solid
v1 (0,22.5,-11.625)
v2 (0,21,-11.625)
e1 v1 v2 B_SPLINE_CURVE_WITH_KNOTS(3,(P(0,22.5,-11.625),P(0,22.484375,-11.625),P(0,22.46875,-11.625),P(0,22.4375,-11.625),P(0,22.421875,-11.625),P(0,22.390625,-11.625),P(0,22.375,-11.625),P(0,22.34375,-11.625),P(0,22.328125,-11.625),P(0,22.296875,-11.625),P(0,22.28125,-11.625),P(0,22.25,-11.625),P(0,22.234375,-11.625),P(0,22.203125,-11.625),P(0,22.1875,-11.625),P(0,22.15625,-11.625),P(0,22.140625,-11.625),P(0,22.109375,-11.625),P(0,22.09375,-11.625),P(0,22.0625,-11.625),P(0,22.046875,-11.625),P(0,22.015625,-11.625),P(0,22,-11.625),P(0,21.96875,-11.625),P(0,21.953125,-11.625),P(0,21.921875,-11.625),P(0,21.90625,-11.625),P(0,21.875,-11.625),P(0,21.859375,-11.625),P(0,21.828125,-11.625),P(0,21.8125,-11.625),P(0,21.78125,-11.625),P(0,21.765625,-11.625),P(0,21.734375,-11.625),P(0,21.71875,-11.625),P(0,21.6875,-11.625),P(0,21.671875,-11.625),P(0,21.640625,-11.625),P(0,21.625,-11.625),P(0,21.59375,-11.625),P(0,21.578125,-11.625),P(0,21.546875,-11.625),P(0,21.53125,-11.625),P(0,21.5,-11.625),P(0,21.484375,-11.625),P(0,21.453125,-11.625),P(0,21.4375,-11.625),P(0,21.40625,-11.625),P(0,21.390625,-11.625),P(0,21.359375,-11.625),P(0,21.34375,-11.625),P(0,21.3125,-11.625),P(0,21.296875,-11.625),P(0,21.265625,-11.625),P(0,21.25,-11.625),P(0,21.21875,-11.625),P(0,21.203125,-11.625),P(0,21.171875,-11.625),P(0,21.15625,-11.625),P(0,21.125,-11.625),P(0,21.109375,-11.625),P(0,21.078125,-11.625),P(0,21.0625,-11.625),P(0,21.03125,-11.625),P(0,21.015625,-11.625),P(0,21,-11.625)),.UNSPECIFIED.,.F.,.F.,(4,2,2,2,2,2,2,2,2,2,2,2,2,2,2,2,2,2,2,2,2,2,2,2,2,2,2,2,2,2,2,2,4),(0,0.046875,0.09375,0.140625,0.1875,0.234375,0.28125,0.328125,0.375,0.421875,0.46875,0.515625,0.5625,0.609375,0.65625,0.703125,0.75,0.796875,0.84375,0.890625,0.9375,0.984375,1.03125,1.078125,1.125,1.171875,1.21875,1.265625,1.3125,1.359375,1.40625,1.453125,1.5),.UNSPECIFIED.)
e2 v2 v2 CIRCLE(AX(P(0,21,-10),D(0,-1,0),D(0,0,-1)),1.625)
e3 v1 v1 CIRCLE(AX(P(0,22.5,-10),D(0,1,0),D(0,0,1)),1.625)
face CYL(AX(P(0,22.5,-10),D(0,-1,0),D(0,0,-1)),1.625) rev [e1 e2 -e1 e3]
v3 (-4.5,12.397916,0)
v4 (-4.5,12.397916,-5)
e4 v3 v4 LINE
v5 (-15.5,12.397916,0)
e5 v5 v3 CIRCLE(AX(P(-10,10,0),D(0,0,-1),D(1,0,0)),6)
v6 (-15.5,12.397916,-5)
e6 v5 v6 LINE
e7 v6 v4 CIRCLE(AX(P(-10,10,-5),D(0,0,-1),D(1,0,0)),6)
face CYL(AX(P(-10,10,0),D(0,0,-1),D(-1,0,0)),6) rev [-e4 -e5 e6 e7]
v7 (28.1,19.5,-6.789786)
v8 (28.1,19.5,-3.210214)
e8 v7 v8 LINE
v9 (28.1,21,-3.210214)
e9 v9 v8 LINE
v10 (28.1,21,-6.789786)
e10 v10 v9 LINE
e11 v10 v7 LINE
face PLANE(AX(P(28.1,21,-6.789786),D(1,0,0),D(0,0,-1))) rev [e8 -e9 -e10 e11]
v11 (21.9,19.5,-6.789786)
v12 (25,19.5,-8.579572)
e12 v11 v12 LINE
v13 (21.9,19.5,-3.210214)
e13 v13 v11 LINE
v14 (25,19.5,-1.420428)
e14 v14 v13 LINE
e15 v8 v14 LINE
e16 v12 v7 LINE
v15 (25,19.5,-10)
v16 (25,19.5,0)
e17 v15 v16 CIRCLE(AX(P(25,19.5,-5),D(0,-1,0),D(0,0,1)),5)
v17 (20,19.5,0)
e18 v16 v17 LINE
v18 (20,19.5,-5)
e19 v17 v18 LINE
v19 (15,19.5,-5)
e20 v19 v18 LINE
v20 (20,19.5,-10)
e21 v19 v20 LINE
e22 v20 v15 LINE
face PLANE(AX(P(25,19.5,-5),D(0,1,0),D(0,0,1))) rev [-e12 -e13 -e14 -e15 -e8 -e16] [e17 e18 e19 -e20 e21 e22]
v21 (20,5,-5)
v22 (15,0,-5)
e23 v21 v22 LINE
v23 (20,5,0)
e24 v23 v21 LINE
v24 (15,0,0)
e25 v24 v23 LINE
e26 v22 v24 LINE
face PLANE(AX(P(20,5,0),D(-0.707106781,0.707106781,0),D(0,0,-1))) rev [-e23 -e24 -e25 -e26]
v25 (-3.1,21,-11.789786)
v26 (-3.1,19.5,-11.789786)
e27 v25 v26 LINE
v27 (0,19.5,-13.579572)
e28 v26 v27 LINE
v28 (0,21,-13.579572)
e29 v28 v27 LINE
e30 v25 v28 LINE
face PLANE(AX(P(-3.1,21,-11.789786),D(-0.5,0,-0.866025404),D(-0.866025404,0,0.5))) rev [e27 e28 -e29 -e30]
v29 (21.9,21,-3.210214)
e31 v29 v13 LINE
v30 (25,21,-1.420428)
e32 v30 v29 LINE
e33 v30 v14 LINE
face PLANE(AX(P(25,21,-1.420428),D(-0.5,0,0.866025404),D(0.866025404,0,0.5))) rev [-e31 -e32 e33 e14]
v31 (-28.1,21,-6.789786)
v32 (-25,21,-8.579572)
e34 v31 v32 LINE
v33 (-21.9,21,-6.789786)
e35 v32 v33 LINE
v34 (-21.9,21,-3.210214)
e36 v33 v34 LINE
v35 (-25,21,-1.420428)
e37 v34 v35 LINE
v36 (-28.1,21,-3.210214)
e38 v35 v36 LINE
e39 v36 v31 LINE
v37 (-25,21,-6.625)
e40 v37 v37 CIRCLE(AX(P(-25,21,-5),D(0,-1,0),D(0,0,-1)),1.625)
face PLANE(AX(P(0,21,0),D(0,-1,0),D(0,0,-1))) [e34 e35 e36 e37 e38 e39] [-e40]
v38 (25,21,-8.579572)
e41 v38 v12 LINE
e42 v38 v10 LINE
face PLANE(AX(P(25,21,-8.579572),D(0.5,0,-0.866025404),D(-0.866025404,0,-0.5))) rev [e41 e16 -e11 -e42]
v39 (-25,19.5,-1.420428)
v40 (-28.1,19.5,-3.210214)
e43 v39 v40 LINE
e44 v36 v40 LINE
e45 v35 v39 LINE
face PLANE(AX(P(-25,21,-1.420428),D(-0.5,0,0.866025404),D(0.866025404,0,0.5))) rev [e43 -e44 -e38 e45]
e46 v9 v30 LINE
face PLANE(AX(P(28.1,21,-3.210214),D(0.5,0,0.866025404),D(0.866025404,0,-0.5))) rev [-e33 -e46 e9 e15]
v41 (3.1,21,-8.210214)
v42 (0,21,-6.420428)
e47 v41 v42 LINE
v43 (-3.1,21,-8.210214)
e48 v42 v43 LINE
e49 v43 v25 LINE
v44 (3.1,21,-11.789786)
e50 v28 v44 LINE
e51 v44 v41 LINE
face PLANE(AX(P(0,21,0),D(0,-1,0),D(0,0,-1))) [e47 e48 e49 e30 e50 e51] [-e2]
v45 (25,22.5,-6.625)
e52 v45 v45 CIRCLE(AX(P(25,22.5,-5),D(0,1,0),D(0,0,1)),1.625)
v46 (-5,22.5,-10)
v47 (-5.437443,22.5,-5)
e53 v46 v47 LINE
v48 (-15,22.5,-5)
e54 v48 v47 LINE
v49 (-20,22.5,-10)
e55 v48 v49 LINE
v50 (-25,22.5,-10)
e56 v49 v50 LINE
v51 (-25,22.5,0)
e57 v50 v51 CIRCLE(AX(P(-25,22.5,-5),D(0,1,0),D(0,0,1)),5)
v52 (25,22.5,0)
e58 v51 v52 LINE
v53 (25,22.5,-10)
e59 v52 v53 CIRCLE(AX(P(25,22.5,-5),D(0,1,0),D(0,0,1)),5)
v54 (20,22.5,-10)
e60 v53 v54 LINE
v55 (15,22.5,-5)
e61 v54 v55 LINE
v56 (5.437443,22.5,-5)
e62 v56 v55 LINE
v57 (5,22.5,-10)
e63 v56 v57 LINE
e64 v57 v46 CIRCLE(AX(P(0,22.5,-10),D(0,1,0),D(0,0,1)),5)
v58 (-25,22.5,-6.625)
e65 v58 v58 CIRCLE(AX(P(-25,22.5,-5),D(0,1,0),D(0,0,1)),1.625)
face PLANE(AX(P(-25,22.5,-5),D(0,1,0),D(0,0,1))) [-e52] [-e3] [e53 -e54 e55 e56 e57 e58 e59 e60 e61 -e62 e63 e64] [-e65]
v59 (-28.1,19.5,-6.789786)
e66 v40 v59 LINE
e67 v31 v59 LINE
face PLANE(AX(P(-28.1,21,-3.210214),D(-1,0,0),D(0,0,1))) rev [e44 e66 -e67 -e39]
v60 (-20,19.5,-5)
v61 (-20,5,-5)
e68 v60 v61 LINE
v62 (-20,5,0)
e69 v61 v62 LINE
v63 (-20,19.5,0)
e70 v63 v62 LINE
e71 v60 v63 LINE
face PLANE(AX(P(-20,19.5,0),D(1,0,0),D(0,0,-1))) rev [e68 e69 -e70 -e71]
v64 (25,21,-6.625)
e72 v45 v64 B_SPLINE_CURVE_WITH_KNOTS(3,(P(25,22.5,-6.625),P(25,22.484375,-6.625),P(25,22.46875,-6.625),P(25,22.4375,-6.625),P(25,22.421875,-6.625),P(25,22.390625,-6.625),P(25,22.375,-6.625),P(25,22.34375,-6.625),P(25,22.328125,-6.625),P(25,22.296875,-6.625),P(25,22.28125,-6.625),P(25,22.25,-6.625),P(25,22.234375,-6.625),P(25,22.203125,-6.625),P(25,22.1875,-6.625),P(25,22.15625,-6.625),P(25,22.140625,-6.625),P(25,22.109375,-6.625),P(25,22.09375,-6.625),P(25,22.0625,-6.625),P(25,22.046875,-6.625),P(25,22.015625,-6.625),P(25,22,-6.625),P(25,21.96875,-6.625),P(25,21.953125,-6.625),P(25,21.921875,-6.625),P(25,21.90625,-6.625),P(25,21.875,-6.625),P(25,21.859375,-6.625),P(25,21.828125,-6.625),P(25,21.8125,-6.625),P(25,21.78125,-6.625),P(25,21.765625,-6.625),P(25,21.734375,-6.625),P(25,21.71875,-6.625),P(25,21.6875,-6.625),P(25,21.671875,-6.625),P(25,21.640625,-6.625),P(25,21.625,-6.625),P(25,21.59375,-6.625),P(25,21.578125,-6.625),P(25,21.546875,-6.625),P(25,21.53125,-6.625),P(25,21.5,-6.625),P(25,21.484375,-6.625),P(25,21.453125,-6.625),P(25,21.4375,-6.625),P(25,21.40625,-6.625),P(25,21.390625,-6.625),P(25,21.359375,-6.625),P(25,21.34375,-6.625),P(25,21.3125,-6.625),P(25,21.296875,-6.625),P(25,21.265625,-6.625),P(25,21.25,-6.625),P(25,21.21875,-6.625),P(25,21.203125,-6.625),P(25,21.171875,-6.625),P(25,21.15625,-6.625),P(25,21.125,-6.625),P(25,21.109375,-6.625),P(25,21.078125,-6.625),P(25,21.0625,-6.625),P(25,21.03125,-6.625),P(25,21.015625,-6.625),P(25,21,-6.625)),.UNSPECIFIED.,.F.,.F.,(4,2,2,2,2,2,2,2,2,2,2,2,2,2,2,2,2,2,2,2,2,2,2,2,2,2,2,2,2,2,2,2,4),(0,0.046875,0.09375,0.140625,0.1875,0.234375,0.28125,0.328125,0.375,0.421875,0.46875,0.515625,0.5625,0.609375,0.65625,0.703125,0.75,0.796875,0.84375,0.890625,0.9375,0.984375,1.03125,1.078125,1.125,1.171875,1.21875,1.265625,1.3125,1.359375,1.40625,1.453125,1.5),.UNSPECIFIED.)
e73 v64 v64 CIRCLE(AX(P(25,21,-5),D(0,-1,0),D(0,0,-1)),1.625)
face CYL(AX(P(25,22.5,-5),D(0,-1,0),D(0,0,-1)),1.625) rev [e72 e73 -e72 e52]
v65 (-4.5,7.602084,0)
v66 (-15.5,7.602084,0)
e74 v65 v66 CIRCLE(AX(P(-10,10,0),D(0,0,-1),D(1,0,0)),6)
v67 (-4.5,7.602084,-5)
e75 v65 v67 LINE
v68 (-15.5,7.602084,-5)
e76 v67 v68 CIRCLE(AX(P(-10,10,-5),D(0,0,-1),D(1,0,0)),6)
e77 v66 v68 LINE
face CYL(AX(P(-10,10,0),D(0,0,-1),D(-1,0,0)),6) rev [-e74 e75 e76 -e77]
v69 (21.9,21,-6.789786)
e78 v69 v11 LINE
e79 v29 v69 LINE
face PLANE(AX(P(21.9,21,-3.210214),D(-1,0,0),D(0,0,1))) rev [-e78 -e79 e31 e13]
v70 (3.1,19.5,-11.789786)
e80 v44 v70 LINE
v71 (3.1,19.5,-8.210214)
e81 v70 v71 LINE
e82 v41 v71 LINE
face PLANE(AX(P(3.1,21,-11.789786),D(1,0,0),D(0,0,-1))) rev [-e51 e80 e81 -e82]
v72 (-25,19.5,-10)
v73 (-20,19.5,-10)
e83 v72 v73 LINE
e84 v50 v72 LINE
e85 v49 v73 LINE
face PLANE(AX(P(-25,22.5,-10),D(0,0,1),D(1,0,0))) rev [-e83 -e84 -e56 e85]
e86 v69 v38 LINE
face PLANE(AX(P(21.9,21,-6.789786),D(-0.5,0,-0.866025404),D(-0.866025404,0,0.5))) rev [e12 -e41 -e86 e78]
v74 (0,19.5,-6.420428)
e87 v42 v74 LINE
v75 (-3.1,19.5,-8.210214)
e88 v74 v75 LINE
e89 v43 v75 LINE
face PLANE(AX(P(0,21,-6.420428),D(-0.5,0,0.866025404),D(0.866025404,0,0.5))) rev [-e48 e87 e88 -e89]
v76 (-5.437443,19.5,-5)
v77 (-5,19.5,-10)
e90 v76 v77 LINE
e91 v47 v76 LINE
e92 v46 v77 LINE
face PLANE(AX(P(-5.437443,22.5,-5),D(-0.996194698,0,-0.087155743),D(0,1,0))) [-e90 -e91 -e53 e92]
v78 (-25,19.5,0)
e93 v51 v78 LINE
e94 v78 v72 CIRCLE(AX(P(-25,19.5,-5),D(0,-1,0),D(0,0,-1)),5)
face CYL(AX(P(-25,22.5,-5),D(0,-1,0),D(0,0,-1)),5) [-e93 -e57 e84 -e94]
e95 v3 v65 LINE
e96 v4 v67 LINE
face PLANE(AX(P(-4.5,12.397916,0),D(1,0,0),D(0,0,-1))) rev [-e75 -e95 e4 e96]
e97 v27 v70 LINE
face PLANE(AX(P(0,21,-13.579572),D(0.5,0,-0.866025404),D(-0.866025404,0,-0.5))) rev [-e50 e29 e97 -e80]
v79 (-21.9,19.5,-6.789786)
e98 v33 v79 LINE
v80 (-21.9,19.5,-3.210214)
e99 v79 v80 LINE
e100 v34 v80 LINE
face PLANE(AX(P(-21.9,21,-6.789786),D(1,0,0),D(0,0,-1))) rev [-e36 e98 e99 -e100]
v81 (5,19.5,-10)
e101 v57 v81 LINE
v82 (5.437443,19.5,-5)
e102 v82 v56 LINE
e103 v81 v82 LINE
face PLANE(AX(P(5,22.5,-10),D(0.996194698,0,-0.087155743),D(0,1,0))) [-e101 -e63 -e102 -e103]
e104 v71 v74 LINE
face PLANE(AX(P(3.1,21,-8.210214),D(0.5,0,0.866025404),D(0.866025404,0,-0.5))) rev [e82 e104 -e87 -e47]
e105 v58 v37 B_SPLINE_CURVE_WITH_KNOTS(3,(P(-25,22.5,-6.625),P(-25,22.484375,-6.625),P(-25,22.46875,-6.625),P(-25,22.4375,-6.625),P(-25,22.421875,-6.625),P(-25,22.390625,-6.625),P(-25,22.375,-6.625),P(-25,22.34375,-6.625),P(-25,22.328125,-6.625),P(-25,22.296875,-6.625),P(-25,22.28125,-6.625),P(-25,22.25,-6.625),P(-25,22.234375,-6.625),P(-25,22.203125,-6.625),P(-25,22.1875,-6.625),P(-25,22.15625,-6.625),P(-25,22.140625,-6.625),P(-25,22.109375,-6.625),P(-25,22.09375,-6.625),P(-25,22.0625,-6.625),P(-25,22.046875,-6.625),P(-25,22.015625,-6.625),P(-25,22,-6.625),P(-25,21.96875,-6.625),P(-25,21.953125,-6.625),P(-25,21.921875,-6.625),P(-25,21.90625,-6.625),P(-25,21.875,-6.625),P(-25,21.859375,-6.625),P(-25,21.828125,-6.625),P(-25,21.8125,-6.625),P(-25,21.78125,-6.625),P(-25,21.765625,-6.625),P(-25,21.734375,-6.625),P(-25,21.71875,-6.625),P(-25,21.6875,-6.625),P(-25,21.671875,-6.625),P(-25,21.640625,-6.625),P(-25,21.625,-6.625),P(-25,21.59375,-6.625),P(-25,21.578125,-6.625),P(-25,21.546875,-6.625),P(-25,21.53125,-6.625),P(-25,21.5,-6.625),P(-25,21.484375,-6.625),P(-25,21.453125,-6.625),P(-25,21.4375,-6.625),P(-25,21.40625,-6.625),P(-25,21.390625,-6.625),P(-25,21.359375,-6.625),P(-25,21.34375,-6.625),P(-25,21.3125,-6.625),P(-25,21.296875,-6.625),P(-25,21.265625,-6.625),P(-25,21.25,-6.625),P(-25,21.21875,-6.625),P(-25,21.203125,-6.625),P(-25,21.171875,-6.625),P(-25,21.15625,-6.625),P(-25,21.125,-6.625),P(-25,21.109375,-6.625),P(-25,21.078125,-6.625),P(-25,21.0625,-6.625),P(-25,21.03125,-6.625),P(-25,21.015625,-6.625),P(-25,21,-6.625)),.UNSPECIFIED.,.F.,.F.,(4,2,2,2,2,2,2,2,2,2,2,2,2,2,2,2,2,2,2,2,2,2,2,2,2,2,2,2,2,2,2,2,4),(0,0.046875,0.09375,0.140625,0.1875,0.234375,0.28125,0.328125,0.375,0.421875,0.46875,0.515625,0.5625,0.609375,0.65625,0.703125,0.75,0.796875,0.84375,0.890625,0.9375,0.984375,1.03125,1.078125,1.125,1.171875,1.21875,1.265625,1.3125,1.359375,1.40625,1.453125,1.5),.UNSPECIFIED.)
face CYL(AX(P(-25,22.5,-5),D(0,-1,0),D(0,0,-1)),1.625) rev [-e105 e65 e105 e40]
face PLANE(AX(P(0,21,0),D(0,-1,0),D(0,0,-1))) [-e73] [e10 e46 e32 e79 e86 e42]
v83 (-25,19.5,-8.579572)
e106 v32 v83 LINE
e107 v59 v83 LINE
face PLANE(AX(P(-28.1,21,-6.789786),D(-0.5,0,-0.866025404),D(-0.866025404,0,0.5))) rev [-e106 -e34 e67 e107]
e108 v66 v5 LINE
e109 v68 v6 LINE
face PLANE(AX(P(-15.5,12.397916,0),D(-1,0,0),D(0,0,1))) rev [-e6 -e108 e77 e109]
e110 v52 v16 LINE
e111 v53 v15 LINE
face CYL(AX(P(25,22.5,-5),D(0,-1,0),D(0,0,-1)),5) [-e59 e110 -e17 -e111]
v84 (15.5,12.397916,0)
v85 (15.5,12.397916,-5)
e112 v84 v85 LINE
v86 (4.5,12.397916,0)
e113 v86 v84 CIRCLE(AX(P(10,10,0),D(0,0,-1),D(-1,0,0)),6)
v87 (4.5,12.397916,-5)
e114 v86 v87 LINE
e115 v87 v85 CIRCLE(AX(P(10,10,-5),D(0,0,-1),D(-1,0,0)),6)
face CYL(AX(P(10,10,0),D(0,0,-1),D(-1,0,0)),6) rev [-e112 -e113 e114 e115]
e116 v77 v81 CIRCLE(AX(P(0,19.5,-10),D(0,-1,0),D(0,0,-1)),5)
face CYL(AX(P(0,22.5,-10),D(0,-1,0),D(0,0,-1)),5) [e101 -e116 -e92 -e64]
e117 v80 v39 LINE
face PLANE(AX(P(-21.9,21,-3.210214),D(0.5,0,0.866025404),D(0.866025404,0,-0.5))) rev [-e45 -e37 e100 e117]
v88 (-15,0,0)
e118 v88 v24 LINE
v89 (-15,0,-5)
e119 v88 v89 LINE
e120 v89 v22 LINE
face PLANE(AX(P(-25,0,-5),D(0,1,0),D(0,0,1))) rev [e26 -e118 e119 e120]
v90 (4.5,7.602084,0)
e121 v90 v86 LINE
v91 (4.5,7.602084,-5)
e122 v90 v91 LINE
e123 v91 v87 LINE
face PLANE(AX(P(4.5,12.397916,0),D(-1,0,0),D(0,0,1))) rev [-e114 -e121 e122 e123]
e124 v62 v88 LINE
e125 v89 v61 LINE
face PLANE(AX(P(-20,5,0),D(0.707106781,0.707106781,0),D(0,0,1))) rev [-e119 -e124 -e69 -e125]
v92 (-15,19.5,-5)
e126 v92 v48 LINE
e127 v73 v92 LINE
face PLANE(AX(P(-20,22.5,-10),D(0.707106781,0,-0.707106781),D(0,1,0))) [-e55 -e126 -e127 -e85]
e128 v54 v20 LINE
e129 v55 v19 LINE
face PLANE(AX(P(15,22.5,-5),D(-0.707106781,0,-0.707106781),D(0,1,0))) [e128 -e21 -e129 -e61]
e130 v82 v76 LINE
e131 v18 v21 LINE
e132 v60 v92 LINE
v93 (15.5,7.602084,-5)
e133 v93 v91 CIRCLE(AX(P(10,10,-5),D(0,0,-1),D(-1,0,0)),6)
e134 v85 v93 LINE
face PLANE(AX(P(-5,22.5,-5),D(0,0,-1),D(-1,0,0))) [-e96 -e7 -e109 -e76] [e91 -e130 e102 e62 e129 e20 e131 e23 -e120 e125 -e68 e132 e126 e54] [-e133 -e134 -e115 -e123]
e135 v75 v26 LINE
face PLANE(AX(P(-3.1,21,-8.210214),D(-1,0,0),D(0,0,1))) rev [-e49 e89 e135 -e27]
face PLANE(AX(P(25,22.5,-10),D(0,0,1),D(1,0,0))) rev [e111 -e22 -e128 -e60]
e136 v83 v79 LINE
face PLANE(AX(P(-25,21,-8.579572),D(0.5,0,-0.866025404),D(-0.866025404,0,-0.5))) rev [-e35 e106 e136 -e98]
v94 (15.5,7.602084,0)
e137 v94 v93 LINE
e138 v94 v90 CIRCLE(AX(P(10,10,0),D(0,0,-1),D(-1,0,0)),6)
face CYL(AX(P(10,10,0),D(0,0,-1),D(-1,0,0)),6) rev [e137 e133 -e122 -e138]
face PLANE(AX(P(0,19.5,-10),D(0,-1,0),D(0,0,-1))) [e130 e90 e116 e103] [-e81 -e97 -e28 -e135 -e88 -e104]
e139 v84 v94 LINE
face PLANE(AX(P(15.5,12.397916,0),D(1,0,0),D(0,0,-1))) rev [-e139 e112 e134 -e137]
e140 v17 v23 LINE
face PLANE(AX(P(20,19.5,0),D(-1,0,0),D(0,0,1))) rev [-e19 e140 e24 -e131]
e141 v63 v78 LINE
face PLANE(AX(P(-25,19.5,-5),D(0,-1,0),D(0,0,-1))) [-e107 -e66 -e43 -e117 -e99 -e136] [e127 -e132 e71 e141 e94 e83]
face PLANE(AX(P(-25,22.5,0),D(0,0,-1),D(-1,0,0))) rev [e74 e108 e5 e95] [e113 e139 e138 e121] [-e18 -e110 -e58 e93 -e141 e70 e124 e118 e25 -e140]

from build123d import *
from OCP.BRepFilletAPI import BRepFilletAPI_MakeChamfer

# Parameters (mm, degrees)
SKETCH1_R           = 1.625
BOSS_EXTRUDE1_DEPTH = 22.5
SKETCH5_W           = 15
SKETCH5_H           = 5
CUT_EXTRUDE1_DEPTH  = 41.388736054
CUT_EXTRUDE2_DEPTH  = 19.5
CUT_EXTRUDE3_DEPTH  = 39.810436741
CHAMFER1_SIZE       = 5
CHAMFER2_SIZE       = 0.437443318
CHAMFER2_SIZE_2     = 5
CHAMFER3_SIZE       = 5
CUT_EXTRUDE4_DEPTH  = 1.5


with BuildPart() as part:
    # Sketch1 → Boss-Extrude1 (new body)
    with BuildSketch(Plane(origin=(0, 0, 0), x_dir=(1, 0, 0), z_dir=(0, 1, 0))):
        with BuildLine():
            Line((-25, 10), (-5, 10))
            ThreePointArc((-5, 10), (0, 15), (5, 10))
            Line((5, 10), (25, 10))
            ThreePointArc((25, 10), (30, 5), (25, 0))
            Line((25, 0), (-25, 0))
            ThreePointArc((-25, 0), (-30, 5), (-25, 10))
        make_face()
        with Locations(Location((-25, 5, 0), (0, 0, 90))):
            Circle(SKETCH1_R, mode=Mode.SUBTRACT)
        with Locations(Location((25, 5, 0), (0, 0, 90))):
            Circle(SKETCH1_R, mode=Mode.SUBTRACT)
        with Locations(Location((0, 10, 0), (0, 0, 90))):
            Circle(SKETCH1_R, mode=Mode.SUBTRACT)
    extrude(amount=BOSS_EXTRUDE1_DEPTH)

    # Sketch5 → Cut-Extrude1 (cut, through all)
    with BuildSketch(Plane(origin=(0, 0, 0), x_dir=(1, 0, 0), z_dir=(0, 1, 0))):
        with Locations((-12.5, 7.5)):
            Rectangle(SKETCH5_W, SKETCH5_H)
        with Locations((12.5, 7.5)):
            Rectangle(SKETCH5_W, SKETCH5_H)
    extrude(amount=CUT_EXTRUDE1_DEPTH, mode=Mode.SUBTRACT)

    # Sketch6 → Cut-Extrude2 (cut)
    with BuildSketch(Plane.XZ):
        with BuildLine():
            Line((-25, 0), (-20, 0))
            Line((-20, 0), (-20, -10))
            Line((-20, -10), (-25, -10))
            ThreePointArc((-25, -10), (-30, -5), (-25, 0))
        make_face()
        with BuildLine():
            Line((20, 0), (20, -10))
            Line((20, -10), (25, -10))
            ThreePointArc((25, -10), (30, -5), (25, 0))
            Line((25, 0), (20, 0))
        make_face()
        with BuildLine():
            Line((-5, -5), (5, -5))
            Line((5, -5), (5, -10))
            ThreePointArc((5, -10), (0, -15), (-5, -10))
            Line((-5, -10), (-5, -5))
        make_face()
    extrude(amount=-CUT_EXTRUDE2_DEPTH, mode=Mode.SUBTRACT)

    # Sketch7 → Cut-Extrude3 (cut, through all)
    with BuildSketch(Plane(origin=(0, 0, -5), x_dir=(-1, 0, 0), z_dir=(0, 0, -1))):
        with BuildLine():
            Line((4.5, 12.397915762), (4.5, 7.602084238))
            ThreePointArc((4.5, 7.602084238), (10, 4), (15.5, 7.602084238))
            Line((15.5, 7.602084238), (15.5, 12.397915762))
            ThreePointArc((15.5, 12.397915762), (10, 16), (4.5, 12.397915762))
        make_face()
        with BuildLine():
            Line((-15.5, 12.397915762), (-15.5, 7.602084238))
            ThreePointArc((-15.5, 7.602084238), (-10, 4), (-4.5, 7.602084238))
            Line((-4.5, 7.602084238), (-4.5, 12.397915762))
            ThreePointArc((-4.5, 12.397915762), (-10, 16), (-15.5, 12.397915762))
        make_face()
    extrude(amount=-CUT_EXTRUDE3_DEPTH, mode=Mode.SUBTRACT)

    # Chamfer1
    chamfer1_edges = [part.edges().sort_by_distance(p)[0] for p in [
        (-20, 21, -5),
        (20, 21, -5),
    ]]
    chamfer(chamfer1_edges, length=CHAMFER1_SIZE - 0.0001)  # a hair under: the kernel refuses the full size

    # Chamfer2
    chamfer2_edges_1 = [part.edges().sort_by_distance(p)[0] for p in [
        (-5, 21, -5),
    ]]
    chamfer2_side_1 = [part.faces().sort_by_distance(p)[0] for p in [
        (-5.008748866, 21, -5),
    ]]
    chamfer2_edges_2 = [part.edges().sort_by_distance(p)[0] for p in [
        (5, 21, -5),
    ]]
    chamfer2_side_2 = [part.faces().sort_by_distance(p)[0] for p in [
        (5.008748866, 21, -5),
    ]]
    chamfer2 = BRepFilletAPI_MakeChamfer(part.part.solid().wrapped)
    for e in chamfer2_edges_1:
        chamfer2.Add(CHAMFER2_SIZE - 0.0001, CHAMFER2_SIZE_2 - 0.0001, e.wrapped, chamfer2_side_1[0].wrapped)
    for e in chamfer2_edges_2:
        chamfer2.Add(CHAMFER2_SIZE - 0.0001, CHAMFER2_SIZE_2 - 0.0001, e.wrapped, chamfer2_side_2[0].wrapped)
    add(Compound.cast(chamfer2.Shape()), mode=Mode.REPLACE)  # a hair under: the kernel refuses the full size

    # Chamfer3
    chamfer3_edges = [part.edges().sort_by_distance(p)[0] for p in [
        (-20, 0, -2.5),
        (20, 0, -2.5),
    ]]
    chamfer(chamfer3_edges, length=CHAMFER3_SIZE)

    # Sketch8 → Cut-Extrude4 (cut)
    with BuildSketch(Plane.XZ.offset(-19.5)):
        Polygon((25, -8.579571669), (28.1, -6.789785834), (28.1, -3.210214166), (25, -1.420428331), (21.9, -3.210214166), (21.9, -6.789785834), align=None)
        Polygon((0, -13.579571669), (3.1, -11.789785834), (3.1, -8.210214166), (0, -6.420428331), (-3.1, -8.210214166), (-3.1, -11.789785834), align=None)
        Polygon((-25, -8.579571669), (-21.9, -6.789785834), (-21.9, -3.210214166), (-25, -1.420428331), (-28.1, -3.210214166), (-28.1, -6.789785834), align=None)
    extrude(amount=-CUT_EXTRUDE4_DEPTH, mode=Mode.SUBTRACT)


solid = part.part
